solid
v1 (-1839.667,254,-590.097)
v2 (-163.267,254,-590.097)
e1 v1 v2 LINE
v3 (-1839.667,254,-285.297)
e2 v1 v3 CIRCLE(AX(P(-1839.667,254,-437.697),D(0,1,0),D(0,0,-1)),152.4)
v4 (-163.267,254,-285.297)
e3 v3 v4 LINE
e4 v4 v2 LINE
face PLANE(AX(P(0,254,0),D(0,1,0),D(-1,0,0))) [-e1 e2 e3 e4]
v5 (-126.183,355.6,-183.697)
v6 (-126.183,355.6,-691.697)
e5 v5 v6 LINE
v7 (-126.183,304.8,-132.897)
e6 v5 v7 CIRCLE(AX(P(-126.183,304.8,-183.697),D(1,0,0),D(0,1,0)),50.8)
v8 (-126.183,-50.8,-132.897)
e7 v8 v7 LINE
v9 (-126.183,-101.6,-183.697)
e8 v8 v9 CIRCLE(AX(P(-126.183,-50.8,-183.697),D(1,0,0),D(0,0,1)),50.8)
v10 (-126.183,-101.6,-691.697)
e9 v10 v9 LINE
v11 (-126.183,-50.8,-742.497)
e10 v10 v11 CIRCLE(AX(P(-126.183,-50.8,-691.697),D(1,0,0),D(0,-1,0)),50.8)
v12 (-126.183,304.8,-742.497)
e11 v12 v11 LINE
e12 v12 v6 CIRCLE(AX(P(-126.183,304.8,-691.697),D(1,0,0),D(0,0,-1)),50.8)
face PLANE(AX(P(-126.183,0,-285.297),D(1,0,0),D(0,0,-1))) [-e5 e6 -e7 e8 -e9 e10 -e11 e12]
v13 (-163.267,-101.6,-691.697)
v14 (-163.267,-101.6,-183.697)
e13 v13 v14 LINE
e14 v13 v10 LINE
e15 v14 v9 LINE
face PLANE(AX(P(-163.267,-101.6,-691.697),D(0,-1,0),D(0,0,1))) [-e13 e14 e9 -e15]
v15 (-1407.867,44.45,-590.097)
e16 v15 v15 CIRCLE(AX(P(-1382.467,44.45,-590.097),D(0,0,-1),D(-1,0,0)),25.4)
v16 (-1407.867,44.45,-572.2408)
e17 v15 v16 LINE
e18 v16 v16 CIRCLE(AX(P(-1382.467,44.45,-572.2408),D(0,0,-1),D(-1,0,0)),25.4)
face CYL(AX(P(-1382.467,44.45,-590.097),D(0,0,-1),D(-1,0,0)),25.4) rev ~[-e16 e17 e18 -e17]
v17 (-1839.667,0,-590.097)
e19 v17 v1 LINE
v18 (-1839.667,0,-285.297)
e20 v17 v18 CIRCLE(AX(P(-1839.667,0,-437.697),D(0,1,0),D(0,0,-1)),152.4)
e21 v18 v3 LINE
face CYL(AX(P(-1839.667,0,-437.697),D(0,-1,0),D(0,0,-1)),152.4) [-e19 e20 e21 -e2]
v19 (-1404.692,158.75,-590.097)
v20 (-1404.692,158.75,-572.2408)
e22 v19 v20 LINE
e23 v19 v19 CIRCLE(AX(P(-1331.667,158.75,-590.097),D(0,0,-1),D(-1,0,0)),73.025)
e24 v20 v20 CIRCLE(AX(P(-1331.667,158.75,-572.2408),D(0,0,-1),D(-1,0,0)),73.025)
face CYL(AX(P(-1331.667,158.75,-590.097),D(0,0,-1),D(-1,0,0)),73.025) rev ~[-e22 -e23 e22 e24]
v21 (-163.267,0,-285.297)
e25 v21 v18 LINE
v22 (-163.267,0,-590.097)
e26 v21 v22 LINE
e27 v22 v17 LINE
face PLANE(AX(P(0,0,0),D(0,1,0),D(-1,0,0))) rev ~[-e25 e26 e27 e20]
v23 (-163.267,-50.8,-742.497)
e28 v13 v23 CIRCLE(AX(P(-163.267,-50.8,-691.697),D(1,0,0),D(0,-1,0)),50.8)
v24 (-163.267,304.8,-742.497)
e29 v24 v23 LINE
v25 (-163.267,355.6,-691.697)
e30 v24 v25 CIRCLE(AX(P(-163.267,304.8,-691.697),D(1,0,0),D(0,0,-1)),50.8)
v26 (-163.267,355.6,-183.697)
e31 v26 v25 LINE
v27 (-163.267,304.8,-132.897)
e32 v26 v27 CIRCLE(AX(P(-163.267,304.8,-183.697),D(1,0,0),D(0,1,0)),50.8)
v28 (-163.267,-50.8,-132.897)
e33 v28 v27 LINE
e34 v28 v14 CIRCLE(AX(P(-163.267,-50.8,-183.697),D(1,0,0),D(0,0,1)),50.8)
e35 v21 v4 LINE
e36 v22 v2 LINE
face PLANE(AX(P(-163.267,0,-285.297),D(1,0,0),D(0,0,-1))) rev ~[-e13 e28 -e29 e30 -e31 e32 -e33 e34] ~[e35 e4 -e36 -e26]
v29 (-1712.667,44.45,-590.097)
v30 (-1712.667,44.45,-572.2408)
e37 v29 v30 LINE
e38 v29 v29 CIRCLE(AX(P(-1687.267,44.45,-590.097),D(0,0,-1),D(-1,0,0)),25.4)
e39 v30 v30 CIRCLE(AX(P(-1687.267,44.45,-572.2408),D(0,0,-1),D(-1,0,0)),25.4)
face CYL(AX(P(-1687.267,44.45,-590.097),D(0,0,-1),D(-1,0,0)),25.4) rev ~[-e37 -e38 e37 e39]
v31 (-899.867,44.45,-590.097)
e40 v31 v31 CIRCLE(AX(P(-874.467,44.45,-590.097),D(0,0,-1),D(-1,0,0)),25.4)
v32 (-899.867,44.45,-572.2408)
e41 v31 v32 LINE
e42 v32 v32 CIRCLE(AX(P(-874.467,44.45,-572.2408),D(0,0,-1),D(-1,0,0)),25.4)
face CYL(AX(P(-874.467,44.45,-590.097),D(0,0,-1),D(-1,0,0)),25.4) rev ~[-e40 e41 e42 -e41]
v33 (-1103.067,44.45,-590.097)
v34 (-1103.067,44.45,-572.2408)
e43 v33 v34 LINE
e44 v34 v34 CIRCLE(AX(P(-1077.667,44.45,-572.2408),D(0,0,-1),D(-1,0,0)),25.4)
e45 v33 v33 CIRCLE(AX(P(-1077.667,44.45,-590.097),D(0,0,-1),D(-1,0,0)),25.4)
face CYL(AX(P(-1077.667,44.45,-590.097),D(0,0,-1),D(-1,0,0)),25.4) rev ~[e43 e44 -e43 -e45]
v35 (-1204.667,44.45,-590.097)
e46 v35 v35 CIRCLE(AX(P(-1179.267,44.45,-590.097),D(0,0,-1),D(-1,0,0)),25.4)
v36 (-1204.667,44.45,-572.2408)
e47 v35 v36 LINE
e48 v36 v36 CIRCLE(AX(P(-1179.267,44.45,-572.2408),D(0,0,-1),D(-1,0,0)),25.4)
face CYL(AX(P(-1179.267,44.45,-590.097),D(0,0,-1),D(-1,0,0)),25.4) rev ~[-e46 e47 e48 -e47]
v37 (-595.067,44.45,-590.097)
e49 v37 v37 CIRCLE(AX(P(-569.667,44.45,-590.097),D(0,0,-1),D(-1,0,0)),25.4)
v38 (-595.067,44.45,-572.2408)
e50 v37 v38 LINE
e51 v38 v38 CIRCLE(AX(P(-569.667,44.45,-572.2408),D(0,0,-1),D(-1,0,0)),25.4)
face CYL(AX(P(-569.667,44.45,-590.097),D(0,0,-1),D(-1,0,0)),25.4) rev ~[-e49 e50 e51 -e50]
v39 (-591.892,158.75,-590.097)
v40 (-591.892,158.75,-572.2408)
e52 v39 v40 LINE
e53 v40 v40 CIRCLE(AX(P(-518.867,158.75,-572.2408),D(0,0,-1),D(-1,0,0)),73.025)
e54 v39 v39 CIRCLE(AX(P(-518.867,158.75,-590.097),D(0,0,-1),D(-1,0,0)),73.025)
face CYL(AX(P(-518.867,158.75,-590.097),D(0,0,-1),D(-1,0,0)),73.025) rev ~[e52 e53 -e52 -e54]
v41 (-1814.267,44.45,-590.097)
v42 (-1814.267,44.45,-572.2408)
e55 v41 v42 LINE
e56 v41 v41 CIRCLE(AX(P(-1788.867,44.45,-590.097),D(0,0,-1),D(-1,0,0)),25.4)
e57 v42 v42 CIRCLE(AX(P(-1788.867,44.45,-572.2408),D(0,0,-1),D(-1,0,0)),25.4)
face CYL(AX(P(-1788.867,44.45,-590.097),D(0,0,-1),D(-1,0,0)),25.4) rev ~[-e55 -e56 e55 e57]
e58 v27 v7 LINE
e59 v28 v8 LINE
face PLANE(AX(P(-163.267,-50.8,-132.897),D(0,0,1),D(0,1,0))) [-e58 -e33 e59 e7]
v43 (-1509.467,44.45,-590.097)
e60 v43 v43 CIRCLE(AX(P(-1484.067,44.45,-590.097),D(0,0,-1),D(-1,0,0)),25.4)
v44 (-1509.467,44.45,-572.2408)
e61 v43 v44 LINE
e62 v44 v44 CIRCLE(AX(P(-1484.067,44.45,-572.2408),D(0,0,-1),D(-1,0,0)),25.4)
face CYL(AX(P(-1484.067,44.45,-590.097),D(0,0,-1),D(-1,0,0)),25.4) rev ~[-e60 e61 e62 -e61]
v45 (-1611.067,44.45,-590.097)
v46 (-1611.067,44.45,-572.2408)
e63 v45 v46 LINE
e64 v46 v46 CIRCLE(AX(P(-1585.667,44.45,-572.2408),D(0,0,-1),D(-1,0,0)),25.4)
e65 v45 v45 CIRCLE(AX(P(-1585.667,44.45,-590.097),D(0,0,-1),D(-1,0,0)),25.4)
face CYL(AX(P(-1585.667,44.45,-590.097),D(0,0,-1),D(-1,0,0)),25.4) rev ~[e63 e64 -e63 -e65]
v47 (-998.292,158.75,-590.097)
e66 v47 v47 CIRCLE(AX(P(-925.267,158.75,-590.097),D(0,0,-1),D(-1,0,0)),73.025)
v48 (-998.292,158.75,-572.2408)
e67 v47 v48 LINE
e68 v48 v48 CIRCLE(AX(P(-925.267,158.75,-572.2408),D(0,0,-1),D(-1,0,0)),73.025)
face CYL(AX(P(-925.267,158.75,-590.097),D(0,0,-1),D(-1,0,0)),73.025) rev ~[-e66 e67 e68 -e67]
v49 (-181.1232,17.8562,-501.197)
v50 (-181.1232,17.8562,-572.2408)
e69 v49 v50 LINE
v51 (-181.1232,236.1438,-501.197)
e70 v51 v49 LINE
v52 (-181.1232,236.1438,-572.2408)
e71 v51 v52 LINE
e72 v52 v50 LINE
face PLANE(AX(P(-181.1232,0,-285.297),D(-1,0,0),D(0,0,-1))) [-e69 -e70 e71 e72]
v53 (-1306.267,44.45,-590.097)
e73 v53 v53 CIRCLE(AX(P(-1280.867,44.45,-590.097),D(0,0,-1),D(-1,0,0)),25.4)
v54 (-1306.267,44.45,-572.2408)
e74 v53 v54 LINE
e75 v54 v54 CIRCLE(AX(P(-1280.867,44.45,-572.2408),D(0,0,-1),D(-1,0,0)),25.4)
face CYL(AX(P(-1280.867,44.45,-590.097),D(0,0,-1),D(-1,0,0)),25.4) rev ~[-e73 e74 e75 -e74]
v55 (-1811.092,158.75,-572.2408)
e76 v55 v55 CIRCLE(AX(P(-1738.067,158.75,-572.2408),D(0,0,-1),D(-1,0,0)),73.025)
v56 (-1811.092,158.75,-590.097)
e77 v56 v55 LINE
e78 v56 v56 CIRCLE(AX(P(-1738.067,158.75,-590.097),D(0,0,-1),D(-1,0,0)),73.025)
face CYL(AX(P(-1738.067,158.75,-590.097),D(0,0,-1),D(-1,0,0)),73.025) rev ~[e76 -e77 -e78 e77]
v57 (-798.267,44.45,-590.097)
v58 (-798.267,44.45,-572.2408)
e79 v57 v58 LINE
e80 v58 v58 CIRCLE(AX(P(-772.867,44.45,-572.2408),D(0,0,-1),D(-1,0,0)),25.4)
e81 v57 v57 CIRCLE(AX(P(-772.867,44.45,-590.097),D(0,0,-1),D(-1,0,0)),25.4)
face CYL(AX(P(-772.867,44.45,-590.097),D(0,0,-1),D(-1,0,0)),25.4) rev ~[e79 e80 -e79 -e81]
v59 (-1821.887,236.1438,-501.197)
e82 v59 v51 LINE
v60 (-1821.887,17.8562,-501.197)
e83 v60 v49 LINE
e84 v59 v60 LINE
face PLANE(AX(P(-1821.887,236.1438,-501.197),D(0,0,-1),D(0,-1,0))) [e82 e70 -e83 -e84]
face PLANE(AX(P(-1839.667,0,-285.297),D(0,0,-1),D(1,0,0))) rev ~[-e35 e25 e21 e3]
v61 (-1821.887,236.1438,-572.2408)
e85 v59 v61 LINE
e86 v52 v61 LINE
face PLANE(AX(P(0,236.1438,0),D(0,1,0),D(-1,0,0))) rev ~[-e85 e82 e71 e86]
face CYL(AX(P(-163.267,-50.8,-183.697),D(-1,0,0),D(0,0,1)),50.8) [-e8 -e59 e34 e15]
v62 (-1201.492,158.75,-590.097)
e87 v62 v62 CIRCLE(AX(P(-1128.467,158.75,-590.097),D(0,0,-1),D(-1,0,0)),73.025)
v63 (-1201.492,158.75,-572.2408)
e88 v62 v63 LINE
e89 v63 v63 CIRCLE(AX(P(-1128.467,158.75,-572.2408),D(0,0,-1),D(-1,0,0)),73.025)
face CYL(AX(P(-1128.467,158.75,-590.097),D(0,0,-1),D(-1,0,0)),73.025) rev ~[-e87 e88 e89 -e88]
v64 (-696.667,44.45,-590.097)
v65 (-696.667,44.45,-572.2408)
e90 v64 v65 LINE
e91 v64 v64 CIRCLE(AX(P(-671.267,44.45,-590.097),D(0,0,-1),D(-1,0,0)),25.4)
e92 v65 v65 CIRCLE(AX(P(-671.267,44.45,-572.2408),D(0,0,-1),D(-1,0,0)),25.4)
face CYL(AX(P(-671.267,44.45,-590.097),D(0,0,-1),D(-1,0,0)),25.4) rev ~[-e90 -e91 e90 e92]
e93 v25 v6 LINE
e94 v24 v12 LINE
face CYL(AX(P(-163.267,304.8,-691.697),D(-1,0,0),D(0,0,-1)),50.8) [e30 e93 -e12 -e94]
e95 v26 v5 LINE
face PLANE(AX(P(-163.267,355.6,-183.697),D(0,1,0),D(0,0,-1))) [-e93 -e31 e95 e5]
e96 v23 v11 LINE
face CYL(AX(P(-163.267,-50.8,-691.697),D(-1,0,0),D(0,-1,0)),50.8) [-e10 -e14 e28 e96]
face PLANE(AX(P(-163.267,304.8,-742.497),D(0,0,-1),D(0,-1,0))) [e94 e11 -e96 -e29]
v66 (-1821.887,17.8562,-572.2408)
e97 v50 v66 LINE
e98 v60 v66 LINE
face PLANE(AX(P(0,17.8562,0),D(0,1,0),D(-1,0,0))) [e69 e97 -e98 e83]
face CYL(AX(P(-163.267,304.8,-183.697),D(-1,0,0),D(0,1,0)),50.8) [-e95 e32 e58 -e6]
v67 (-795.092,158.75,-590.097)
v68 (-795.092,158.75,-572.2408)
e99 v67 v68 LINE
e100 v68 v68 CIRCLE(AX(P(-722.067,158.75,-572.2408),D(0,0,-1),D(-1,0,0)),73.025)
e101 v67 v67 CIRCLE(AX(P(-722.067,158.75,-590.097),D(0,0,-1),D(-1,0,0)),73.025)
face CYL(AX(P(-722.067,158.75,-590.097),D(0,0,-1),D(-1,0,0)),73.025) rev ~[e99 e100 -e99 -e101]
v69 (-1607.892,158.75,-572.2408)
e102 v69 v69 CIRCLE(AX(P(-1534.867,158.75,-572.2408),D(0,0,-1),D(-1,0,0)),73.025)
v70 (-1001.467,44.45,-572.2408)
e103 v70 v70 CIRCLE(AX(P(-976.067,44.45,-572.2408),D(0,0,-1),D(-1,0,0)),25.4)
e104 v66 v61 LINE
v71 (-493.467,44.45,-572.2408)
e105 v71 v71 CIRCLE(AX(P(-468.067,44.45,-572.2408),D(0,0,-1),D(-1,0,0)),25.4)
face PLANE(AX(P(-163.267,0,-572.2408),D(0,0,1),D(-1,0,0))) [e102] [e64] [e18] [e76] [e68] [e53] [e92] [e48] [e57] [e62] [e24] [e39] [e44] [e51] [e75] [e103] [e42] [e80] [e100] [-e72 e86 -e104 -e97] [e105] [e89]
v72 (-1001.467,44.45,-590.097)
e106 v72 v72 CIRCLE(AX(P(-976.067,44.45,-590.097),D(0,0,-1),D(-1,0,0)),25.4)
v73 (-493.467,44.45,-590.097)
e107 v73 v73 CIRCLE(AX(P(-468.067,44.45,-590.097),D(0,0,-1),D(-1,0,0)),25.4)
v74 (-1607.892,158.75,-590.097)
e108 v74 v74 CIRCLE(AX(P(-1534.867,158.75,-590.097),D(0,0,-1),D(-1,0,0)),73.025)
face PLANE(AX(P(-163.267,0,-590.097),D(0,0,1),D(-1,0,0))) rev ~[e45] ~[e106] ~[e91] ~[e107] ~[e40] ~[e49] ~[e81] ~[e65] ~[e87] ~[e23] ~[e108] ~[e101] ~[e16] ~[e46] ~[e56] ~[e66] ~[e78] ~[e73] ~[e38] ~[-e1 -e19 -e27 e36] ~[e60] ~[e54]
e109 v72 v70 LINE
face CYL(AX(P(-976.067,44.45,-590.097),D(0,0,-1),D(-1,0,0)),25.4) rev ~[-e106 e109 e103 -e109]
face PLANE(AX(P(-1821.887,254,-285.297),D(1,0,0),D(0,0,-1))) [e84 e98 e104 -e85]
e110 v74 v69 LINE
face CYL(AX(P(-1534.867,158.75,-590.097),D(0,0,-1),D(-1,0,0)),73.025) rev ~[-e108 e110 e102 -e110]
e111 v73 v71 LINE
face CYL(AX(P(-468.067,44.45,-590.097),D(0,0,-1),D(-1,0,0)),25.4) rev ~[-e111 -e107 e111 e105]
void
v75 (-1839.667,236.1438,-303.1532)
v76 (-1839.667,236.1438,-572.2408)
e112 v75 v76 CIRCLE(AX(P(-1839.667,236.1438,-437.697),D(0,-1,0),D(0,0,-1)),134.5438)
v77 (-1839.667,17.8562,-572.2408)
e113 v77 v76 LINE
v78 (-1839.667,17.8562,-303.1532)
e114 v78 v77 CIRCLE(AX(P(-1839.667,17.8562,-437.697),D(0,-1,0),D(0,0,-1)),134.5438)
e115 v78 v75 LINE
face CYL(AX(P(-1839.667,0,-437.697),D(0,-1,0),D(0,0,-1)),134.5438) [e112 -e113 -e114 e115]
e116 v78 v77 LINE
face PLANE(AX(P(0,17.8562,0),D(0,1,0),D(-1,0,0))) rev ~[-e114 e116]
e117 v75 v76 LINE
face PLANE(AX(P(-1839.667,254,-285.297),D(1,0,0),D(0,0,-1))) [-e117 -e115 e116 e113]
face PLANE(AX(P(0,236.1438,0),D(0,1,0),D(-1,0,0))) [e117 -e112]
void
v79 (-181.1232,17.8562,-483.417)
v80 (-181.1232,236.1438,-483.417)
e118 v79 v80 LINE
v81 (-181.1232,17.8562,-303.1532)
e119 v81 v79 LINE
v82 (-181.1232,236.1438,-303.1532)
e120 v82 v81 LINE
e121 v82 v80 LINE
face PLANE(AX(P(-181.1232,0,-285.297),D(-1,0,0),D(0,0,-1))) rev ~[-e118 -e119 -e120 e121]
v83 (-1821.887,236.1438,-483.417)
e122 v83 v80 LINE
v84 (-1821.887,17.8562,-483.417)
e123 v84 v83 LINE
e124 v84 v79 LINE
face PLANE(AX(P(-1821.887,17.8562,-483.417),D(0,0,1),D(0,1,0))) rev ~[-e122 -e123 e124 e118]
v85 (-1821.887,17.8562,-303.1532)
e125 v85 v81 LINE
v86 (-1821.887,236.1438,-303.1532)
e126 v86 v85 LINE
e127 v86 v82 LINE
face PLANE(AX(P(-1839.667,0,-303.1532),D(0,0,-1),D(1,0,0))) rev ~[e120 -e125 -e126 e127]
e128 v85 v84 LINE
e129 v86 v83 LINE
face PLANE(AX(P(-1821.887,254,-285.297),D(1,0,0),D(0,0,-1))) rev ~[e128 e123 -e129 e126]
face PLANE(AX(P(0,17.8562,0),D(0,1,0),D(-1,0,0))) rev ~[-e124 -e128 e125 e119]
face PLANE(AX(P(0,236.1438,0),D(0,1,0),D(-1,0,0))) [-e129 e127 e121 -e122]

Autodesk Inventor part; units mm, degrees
ref_plane "YZ Plane" through (0, 0, 0) normal (1, 0, 0) x (0, 1, 0)
ref_plane "XZ Plane" through (0, 0, 0) normal (0, 1, 0) x (-1, 0, 0)
ref_plane "XY Plane" through (0, 0, 0) normal (0, 0, 1) x (1, 0, 0)
sketch "Sketch1" plane through (0, 0, 0) normal (0, 1, 0) x (-1, 0, 0)
  line L0 (1839.667, -285.297) -> (163.267, -285.297)
  line L1 (163.267, -285.297) -> (163.267, -590.097)
  line L2 (163.267, -590.097) -> (1839.667, -590.097)
  arc A0 (1839.667, -590.097) -> (1839.667, -285.297) centre (1839.667, -437.697) ccw
  line L3 (1839.667, -590.097) -> (1839.667, -285.297) construction
  point P0 (0, 0)
  dimension "d0" = 1828.8
  dimension "d2" = 152.4
  dimension "d5" = 304.8
  dimension "d43" = 590.097
  dimension "d59" = 1839.667
extrude "Extrusion1" add sketch "Sketch1" along normal blind 254
shell "Shell1" thickness 17.8562 removed faces 0
sketch "Sketch2" plane through (-163.267, 0, -590.097) normal (0, 0, -1) x (-1, 0, 0)
  circle A0 centre (355.6, 158.75) radius 73.025
  line L0 (0, 0) -> (0, 254) projected
  line L1 (0, 254) -> (1676.4, 254) projected
  circle A1 centre (558.8, 158.75) radius 73.025
  circle A2 centre (762, 158.75) radius 73.025
  circle A3 centre (965.2, 158.75) radius 73.025
  circle A4 centre (1168.4, 158.75) radius 73.025
  circle A5 centre (1371.6, 158.75) radius 73.025
  circle A6 centre (1574.8, 158.75) radius 73.025
  circle A7 centre (304.8, 44.45) radius 25.4
  circle A8 centre (406.4, 44.45) radius 25.4
  circle A9 centre (508, 44.45) radius 25.4
  circle A10 centre (609.6, 44.45) radius 25.4
  circle A11 centre (711.2, 44.45) radius 25.4
  circle A12 centre (812.8, 44.45) radius 25.4
  circle A13 centre (914.4, 44.45) radius 25.4
  circle A14 centre (1016, 44.45) radius 25.4
  circle A15 centre (1117.6, 44.45) radius 25.4
  circle A16 centre (1219.2, 44.45) radius 25.4
  circle A17 centre (1320.8, 44.45) radius 25.4
  circle A18 centre (1422.4, 44.45) radius 25.4
  circle A19 centre (1524, 44.45) radius 25.4
  circle A20 centre (1625.6, 44.45) radius 25.4
  point P0 (-163.267, 0)
  dimension "d11" = 146.05
  dimension "d12" = 355.6
  dimension "d13" = 95.25
  dimension "d19" = 203.2
  dimension "d21" = 304.8
  dimension "d22" = 209.55
  dimension "d23" = 50.8
  dimension "d26" = 101.6
extrude "Extrusion4" cut sketch "Sketch2" against normal blind 50.8
sketch "Sketch9" plane through (-163.267, 0, -285.297) normal (1, 0, 0) x (0, 0, -1)
  line L0 (406.4, -101.6) -> (-101.6, -101.6)
  line L1 (-152.4, -50.8) -> (-152.4, 304.8)
  line L2 (-101.6, 355.6) -> (406.4, 355.6)
  line L3 (457.2, 304.8) -> (457.2, -50.8)
  line L4 (304.8, 0) -> (0, 0) construction
  line L5 (152.4, 0) -> (152.4, -101.6) construction
  line L6 (304.8, 0) -> (304.8, 254) construction
  line L7 (304.8, 127) -> (457.2, 127) construction
  arc A0 (406.4, -101.6) -> (457.2, -50.8) centre (406.4, -50.8) ccw
  arc A1 (-152.4, -50.8) -> (-101.6, -101.6) centre (-101.6, -50.8) ccw
  arc A2 (-101.6, 355.6) -> (-152.4, 304.8) centre (-101.6, 304.8) ccw
  arc A3 (457.2, 304.8) -> (406.4, 355.6) centre (406.4, 304.8) ccw
  point P0 (-285.297, 0)
  point P1 (457.2, -101.6)
  point P2 (-152.4, -101.6)
  point P3 (457.2, 355.6)
  dimension "d50" = 457.2
  dimension "d51" = 609.6
  dimension "d52" = 50.8
extrude "Extrusion5" add sketch "Sketch9" along normal blind 37.084
sketch "Sketch10" plane through (-1839.667, 0, -590.097) normal (0, 0, -1) x (-1, 0, 0)
  line L0 (-406.4, 751.6147) -> (-406.4, -779.9775) construction
  line L1 (-1676.4, 304.8) -> (-1676.4, -50.8) construction
  point P0 (-1839.667, 0)
  dimension "d55" = 1531.5921
  dimension "d56" = 1270
sketch "Sketch11" plane through (0, 254, 0) normal (0, 1, 0) x (1, 0, 0)
  line L0 (-1839.667, 285.297) -> (-1839.667, 590.097)
  line L1 (-1839.667, 590.097) -> (-1821.125, 590.097)
  line L2 (-163.267, 590.097) -> (-1839.667, 590.097) projected
  arc A0 (-1839.667, 590.097) -> (-1839.667, 285.297) centre (-1839.667, 437.697) ccw projected
  line L3 (-1821.887, 285.297) -> (-1839.667, 285.297)
  line L4 (-1821.887, 285.297) -> (-1821.887, 590.097)
  line L5 (-1821.887, 590.097) -> (-1839.667, 590.097)
  point P0 (0, 0)
  dimension "d58" = 17.78
extrude "Extrusion6" add sketch "Sketch11" against normal blind 254 contours L0 L1 L4 L3
sketch "Sketch12" plane through (-1821.887, 17.8562, -303.1532) normal (1, 0, 0) x (0, 0, -1)
  line L0 (269.0876, 218.2876) -> (0, 218.2876) projected
  line L1 (198.0438, 218.2876) -> (198.0438, 0)
  line L2 (0, 0) -> (269.0876, 0) projected
  line L3 (198.0438, 0) -> (180.2638, 0)
  line L4 (180.2638, 0) -> (180.2638, 218.2876)
  line L5 (180.2638, 218.2876) -> (198.0438, 218.2876)
  line L6 (286.9438, -17.8562) -> (286.9438, 236.1438) projected
  point P0 (-303.1532, -17.8562)
  dimension "d62" = 17.78
  dimension "d63" = 88.9
extrude "Extrusion7" add sketch "Sketch12" along normal blind 1651
properties part number "LineArray"
